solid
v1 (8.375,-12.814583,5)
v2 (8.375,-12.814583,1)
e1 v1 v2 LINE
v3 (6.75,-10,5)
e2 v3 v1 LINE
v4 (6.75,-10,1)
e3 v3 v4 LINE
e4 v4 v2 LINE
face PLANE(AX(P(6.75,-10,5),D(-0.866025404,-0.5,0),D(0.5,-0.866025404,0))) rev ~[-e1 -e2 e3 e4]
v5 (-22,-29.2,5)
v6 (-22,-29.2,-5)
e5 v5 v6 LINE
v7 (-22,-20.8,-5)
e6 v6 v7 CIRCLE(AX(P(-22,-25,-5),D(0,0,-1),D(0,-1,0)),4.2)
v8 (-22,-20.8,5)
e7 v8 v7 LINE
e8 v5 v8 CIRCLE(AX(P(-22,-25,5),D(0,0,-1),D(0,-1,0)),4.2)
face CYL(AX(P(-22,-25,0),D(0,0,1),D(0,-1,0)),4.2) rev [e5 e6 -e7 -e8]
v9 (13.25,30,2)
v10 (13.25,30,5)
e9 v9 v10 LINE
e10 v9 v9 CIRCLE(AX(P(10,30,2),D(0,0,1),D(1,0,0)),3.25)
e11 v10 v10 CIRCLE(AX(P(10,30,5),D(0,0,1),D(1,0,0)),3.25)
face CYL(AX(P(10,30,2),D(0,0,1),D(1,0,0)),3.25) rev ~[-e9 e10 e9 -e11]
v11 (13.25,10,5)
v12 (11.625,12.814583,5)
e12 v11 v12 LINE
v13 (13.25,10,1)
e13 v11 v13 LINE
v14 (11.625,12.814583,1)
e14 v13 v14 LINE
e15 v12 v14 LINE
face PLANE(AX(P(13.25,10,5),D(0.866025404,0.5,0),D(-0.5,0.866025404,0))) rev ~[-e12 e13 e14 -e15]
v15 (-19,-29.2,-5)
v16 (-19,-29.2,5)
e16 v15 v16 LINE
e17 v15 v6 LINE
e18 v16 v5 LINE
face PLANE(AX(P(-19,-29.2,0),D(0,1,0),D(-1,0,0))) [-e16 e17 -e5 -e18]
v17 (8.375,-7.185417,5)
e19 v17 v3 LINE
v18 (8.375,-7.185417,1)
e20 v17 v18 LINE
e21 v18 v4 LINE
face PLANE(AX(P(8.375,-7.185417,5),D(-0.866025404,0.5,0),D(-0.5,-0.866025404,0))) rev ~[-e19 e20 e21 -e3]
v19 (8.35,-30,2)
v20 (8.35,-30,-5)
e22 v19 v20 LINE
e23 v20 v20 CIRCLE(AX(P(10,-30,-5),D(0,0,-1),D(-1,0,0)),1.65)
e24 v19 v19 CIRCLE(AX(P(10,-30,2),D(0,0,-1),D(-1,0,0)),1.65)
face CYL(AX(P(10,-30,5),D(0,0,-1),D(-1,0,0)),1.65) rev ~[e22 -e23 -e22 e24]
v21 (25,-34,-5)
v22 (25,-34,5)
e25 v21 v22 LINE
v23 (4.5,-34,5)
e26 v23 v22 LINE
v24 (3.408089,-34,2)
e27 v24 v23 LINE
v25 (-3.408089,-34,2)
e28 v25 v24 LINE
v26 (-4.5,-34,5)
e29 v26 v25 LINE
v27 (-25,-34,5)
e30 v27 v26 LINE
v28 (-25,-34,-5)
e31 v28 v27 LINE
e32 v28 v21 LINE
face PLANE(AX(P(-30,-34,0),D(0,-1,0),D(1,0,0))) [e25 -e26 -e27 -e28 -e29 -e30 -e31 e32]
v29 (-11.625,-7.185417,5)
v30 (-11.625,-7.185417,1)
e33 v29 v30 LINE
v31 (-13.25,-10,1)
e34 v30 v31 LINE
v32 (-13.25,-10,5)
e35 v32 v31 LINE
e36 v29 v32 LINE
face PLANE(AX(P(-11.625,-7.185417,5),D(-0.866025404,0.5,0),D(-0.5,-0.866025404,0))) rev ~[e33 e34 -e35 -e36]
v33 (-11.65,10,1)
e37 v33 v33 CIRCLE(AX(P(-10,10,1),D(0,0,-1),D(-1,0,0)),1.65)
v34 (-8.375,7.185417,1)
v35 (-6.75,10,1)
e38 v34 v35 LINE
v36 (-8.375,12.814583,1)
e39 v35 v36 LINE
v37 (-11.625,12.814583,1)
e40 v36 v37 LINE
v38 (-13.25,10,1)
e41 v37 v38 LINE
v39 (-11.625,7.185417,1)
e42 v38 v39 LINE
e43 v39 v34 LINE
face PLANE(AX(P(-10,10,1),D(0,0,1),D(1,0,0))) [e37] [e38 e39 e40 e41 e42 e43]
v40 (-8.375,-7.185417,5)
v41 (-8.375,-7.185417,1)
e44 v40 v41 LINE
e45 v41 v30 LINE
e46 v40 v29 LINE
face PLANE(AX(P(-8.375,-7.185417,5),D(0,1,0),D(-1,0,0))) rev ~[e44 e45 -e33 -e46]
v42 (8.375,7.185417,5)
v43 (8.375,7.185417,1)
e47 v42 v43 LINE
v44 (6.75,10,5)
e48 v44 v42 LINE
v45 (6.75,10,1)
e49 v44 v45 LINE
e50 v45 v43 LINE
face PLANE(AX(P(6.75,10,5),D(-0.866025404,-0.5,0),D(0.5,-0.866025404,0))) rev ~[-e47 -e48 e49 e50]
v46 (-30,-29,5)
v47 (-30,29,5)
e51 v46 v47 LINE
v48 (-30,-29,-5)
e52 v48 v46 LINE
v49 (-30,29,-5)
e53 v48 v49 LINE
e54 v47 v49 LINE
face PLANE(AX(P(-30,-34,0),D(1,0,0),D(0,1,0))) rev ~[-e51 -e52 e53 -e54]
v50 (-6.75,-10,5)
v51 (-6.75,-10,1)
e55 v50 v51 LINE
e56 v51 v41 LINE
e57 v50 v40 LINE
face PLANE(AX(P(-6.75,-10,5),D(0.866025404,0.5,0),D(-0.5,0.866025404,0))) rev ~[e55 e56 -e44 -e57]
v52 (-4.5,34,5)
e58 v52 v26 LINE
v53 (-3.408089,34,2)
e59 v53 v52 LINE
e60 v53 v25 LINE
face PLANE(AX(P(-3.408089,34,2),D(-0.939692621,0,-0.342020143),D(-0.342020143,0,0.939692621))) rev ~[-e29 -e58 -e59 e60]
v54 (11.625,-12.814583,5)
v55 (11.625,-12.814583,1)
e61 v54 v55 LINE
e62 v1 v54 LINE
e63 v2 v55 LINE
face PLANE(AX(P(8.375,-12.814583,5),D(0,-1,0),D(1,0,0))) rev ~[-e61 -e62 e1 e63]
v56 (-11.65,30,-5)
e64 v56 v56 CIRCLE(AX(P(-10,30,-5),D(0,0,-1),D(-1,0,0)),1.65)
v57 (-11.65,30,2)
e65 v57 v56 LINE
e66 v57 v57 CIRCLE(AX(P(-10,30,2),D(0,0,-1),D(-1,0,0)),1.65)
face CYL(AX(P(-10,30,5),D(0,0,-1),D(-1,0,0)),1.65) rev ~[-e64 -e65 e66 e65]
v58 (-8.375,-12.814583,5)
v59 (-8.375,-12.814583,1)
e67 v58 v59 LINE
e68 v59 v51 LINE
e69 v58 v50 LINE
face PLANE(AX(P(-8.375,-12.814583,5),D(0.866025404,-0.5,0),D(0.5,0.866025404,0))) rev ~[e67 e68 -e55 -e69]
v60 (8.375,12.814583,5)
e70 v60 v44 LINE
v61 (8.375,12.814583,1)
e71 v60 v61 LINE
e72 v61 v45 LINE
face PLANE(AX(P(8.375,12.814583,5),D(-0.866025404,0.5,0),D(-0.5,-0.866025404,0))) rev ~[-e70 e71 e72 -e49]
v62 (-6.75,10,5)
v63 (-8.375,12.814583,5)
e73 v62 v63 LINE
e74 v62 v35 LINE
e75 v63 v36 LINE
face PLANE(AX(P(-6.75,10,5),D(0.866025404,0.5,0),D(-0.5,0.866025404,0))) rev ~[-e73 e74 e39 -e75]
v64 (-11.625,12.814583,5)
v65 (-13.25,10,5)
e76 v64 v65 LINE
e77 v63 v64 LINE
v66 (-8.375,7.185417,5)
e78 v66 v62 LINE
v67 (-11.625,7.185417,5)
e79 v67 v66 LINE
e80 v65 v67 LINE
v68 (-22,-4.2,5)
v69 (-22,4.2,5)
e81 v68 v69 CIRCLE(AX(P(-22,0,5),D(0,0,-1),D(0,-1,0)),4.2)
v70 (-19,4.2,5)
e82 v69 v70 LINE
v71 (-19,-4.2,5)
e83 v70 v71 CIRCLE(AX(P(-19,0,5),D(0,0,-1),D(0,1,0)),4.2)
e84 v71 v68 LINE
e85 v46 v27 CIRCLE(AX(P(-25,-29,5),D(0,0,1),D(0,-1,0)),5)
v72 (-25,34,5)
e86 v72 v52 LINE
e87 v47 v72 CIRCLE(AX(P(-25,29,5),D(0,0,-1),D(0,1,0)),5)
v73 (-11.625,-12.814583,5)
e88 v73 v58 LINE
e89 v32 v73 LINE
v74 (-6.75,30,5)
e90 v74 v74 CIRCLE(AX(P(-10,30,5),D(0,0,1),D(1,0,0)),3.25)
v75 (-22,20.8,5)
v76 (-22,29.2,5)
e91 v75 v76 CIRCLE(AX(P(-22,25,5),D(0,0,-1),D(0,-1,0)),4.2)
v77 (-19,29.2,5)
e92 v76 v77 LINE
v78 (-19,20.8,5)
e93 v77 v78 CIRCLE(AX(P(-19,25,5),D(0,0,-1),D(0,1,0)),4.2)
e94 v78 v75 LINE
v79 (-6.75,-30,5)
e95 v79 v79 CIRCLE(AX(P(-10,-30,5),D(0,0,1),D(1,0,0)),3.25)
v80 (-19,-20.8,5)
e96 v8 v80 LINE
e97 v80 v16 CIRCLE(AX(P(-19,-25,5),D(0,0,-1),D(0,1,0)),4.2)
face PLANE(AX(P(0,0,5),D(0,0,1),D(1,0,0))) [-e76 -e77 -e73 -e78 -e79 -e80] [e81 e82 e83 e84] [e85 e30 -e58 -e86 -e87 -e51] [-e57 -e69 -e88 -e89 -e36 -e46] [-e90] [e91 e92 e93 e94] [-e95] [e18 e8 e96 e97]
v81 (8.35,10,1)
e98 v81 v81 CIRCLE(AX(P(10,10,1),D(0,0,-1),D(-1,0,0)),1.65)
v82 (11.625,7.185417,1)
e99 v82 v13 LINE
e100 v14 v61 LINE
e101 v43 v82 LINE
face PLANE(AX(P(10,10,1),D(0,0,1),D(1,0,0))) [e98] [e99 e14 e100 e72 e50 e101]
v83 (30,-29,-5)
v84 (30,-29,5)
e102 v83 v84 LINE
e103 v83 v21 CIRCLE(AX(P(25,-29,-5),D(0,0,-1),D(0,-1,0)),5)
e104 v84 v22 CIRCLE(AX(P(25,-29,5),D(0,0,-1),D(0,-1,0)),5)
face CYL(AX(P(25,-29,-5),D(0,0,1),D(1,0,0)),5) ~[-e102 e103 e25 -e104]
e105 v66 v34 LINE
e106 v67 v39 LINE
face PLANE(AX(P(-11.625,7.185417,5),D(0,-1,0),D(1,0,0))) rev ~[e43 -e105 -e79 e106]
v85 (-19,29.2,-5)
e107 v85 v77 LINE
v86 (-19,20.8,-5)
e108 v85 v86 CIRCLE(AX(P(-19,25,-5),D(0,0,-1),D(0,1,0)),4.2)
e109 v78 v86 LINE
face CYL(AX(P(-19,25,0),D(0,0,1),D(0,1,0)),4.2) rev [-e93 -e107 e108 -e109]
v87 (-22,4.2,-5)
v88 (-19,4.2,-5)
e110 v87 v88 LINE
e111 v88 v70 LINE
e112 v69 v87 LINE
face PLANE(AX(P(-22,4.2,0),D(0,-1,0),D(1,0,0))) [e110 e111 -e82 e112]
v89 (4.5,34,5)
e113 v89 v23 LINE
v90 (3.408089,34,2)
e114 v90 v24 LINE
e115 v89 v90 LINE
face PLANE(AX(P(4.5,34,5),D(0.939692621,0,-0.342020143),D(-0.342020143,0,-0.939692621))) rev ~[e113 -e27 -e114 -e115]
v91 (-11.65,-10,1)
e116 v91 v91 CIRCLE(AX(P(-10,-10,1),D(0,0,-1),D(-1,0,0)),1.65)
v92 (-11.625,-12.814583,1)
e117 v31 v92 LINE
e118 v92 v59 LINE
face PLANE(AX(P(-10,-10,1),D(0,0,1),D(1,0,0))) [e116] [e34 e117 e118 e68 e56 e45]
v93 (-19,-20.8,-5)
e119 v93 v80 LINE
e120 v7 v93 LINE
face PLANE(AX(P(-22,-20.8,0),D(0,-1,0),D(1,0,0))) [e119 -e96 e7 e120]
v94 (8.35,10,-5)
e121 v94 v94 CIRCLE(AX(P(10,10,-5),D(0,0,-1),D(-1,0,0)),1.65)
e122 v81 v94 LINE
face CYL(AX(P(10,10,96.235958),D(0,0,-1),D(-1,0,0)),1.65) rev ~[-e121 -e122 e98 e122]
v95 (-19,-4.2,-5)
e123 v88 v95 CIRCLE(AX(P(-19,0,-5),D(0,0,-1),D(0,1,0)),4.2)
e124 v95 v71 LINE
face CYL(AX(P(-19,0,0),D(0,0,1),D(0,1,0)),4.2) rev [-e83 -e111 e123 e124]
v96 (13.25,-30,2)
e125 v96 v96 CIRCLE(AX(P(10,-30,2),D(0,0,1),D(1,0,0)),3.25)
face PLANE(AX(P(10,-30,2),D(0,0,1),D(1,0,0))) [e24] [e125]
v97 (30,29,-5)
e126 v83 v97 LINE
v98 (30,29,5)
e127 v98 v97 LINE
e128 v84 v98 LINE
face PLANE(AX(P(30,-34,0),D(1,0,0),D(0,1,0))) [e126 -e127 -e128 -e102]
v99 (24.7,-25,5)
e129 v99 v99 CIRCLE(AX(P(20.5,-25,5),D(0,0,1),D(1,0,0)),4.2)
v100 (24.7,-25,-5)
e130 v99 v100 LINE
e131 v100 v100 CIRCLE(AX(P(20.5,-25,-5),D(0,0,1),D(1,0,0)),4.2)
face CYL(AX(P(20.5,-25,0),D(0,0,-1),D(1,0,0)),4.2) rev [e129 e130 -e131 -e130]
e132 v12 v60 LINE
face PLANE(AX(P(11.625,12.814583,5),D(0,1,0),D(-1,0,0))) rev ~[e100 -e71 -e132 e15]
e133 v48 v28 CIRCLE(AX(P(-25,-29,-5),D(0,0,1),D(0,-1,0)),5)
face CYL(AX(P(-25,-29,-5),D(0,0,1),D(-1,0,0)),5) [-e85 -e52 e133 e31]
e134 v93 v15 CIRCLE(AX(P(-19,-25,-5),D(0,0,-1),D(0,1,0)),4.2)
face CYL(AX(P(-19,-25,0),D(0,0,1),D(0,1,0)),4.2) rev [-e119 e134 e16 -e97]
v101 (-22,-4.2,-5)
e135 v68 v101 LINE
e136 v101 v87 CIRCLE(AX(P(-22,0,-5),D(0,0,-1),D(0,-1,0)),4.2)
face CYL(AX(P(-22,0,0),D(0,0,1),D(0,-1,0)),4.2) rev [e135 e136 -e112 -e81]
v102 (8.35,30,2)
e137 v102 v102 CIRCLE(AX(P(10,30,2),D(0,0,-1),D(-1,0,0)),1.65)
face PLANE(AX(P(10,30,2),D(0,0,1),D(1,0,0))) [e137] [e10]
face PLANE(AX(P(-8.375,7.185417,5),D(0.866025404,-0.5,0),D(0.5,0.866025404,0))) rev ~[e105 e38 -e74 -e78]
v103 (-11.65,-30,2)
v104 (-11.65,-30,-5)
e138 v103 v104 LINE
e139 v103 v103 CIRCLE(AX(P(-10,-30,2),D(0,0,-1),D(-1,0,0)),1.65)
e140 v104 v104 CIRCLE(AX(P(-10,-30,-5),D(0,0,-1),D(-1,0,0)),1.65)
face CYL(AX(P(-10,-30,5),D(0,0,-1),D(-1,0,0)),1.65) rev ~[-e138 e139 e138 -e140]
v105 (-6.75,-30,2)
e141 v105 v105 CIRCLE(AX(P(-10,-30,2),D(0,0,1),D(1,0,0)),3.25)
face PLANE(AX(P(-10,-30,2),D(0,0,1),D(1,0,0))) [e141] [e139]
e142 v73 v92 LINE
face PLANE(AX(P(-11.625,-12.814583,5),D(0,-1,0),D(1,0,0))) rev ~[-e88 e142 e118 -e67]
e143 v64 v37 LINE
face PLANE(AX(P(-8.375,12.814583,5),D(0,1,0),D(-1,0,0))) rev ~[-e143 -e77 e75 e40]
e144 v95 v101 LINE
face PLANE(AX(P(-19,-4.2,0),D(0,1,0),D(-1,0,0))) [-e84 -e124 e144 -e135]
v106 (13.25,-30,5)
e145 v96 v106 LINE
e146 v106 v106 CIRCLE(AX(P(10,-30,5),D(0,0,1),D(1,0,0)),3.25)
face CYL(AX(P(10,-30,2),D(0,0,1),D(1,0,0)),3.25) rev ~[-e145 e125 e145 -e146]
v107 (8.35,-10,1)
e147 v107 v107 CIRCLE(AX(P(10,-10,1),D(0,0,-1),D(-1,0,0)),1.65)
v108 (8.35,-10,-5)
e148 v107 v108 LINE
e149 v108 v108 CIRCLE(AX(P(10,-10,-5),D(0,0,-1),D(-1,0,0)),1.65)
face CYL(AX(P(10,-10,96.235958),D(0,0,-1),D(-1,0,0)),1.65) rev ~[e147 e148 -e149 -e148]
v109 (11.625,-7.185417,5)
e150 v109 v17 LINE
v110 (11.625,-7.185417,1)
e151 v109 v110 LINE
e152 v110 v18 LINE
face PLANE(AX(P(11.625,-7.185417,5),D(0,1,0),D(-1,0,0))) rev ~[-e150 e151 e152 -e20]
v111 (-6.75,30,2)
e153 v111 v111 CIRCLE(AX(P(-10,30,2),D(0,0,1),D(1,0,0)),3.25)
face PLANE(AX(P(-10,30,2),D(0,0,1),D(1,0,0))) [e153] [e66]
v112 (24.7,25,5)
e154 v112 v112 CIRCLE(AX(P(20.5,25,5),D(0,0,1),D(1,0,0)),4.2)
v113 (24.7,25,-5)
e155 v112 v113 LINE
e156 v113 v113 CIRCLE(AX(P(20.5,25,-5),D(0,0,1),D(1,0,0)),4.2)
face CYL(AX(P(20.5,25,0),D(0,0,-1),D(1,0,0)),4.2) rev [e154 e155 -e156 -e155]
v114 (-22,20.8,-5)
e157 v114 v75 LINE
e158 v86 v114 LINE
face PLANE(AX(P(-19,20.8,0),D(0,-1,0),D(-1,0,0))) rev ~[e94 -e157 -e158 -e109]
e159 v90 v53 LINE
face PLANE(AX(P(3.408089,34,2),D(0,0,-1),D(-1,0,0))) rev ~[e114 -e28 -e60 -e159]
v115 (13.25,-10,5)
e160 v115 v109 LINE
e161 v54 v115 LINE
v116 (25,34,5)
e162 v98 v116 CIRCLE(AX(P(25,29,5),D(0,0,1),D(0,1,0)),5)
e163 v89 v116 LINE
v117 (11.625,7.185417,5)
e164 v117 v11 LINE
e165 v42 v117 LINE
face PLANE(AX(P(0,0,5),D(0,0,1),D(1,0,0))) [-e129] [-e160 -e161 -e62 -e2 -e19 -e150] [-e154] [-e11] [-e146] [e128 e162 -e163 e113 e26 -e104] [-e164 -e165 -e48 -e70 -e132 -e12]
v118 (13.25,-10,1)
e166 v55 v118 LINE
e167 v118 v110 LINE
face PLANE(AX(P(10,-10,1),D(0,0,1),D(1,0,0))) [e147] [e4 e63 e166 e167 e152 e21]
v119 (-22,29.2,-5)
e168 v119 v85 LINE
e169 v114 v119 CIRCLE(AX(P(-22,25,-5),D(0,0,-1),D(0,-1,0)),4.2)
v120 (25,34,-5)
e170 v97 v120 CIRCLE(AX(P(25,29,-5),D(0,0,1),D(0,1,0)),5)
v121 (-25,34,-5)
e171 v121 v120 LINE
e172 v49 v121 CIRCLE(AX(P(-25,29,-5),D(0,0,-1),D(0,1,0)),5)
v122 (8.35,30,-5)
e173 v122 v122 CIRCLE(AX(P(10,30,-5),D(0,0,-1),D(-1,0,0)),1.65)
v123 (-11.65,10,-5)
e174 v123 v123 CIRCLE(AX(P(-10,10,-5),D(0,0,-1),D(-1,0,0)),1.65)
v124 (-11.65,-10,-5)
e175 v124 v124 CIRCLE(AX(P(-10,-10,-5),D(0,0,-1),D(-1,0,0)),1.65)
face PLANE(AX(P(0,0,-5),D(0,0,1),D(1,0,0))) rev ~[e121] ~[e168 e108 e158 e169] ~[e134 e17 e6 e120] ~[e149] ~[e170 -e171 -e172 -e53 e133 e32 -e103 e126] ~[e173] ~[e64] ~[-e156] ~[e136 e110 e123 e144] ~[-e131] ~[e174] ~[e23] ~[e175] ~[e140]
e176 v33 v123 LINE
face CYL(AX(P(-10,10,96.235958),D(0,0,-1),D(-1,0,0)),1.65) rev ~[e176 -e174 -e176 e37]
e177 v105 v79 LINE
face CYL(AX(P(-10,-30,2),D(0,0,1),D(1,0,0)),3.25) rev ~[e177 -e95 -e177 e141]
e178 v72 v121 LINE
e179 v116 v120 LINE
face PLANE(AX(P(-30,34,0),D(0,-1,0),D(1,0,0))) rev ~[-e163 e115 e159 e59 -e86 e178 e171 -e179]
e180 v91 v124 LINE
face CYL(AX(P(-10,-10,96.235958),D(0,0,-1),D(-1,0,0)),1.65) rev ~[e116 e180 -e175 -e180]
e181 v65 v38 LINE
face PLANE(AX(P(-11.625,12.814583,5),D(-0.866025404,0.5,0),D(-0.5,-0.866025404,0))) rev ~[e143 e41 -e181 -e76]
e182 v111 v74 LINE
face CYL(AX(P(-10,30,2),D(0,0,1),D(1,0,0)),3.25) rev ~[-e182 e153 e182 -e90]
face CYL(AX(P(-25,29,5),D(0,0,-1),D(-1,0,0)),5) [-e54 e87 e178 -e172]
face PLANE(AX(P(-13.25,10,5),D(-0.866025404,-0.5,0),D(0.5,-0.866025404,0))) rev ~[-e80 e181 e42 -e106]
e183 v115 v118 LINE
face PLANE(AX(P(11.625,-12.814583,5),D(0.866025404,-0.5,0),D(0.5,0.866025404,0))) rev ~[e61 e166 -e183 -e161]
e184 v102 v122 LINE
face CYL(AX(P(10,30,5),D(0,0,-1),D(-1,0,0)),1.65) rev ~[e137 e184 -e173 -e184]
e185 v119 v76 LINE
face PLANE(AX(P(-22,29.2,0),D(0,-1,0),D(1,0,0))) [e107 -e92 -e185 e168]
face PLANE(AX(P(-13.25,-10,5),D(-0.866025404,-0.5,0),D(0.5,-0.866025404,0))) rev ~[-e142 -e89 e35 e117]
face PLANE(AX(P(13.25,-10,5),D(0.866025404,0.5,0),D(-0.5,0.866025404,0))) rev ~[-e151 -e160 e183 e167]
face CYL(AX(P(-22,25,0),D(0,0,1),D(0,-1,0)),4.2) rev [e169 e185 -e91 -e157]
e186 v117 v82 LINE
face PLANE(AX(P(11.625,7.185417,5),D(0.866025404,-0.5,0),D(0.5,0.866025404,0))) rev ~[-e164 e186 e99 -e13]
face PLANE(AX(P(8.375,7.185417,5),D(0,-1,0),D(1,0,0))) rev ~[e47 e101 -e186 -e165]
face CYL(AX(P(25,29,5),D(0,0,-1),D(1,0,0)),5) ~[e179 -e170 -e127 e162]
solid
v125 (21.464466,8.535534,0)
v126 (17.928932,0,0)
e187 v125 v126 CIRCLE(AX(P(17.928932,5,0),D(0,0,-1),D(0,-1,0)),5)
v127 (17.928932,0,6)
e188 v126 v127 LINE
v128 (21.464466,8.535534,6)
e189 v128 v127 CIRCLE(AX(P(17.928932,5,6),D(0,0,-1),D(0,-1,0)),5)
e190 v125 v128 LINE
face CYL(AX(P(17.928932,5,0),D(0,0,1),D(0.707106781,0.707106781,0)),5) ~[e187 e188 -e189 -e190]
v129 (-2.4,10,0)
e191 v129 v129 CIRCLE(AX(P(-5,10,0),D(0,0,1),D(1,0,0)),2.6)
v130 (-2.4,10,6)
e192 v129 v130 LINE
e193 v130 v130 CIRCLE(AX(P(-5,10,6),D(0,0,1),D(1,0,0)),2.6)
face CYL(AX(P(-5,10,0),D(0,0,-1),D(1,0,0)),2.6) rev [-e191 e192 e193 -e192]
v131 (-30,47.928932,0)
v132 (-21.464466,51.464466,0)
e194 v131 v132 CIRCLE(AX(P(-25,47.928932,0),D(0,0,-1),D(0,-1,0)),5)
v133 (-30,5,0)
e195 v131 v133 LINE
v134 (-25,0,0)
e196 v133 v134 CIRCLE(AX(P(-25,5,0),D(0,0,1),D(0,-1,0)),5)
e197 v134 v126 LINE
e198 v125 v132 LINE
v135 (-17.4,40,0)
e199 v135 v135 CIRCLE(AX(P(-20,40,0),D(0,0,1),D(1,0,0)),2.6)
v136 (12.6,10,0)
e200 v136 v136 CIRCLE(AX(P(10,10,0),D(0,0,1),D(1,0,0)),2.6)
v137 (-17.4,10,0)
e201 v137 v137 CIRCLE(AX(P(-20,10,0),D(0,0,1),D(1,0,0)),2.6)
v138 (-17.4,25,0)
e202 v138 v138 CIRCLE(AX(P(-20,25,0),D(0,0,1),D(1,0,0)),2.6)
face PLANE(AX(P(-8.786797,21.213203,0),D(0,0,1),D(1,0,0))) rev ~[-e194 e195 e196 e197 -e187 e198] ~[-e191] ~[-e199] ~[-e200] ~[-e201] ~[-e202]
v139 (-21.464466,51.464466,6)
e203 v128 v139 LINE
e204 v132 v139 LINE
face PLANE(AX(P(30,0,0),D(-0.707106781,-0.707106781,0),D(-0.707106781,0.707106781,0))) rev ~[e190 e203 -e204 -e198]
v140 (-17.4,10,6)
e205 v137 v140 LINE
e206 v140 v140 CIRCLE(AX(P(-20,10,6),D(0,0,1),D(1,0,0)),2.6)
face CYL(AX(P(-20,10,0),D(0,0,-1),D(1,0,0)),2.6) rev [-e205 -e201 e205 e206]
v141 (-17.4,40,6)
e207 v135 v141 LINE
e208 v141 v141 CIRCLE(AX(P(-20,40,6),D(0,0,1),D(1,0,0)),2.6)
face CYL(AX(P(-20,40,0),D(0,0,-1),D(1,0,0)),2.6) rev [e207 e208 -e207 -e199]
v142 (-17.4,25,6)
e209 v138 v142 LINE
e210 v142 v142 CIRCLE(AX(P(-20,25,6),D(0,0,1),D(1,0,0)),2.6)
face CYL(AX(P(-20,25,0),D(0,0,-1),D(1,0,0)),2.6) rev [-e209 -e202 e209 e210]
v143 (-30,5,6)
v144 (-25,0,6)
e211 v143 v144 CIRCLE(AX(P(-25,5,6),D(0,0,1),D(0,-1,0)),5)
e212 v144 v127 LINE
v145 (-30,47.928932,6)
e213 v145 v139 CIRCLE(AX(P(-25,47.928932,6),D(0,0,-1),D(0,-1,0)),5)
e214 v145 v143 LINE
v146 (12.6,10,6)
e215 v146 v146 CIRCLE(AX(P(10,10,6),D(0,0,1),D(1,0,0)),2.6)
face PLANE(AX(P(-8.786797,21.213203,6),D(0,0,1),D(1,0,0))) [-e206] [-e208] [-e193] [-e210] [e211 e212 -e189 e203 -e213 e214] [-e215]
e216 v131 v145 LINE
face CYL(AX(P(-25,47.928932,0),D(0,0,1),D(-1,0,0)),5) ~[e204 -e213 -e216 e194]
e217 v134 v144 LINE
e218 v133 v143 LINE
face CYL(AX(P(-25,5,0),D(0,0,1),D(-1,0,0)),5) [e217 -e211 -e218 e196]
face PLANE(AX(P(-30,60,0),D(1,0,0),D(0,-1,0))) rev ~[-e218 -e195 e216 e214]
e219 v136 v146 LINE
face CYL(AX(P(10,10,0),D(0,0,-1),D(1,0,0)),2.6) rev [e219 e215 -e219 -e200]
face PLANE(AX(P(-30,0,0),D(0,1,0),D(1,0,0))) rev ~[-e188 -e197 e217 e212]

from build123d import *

# Parameters (mm, degrees)
F0_R           = 2.6
F1_DEPTH       = 6
F2_R           = 5
F3_W           = 60
F3_H           = 68
F3_R           = 4.2
F4_DEPTH       = 5
F5_R           = 5
F7_D           = 3.3
F7_CBORE_D     = 6.5
F7_CBORE_DEPTH = 3
F9_DEPTH       = 4
F10_D          = 3.3
F12_DEPTH      = 3
F12_TAPER      = 20
F13_DEPTH      = 68.001


with BuildPart() as f1:
    # F0 (on Top) → F1 (new body)
    with BuildSketch(Plane.XY):
        Polygon((-30, 60), (-30, 0), (30, 0), align=None)
        with Locations((-20, 10)):
            Circle(F0_R, mode=Mode.SUBTRACT)
        with Locations((-5, 10)):
            Circle(F0_R, mode=Mode.SUBTRACT)
        with Locations((-20, 25)):
            Circle(F0_R, mode=Mode.SUBTRACT)
        with Locations((10, 10)):
            Circle(F0_R, mode=Mode.SUBTRACT)
        with Locations((-20, 40)):
            Circle(F0_R, mode=Mode.SUBTRACT)
    extrude(amount=F1_DEPTH)

    # F2
    f2_edges = [f1.edges().sort_by_distance(p)[0] for p in [
        (-30, 0, 3),
        (30, 0, 3),
        (-30, 60, 3),
    ]]
    fillet(f2_edges, radius=F2_R)


with BuildPart() as f4:
    # F3 (on Top) → F4 (new body, symmetric)
    with BuildSketch(Plane.XY):
        Rectangle(F3_W, F3_H)
        with BuildLine():
            ThreePointArc((-19, -20.8), (-14.8, -25), (-19, -29.2))
            Line((-19, -29.2), (-22, -29.2))
            ThreePointArc((-22, -29.2), (-26.2, -25), (-22, -20.8))
            Line((-22, -20.8), (-19, -20.8))
        make_face(mode=Mode.SUBTRACT)
        with Locations((20.5, -25)):
            Circle(F3_R, mode=Mode.SUBTRACT)
        with BuildLine():
            ThreePointArc((-19, 4.2), (-14.8, 0), (-19, -4.2))
            Line((-19, -4.2), (-22, -4.2))
            ThreePointArc((-22, -4.2), (-26.2, 0), (-22, 4.2))
            Line((-22, 4.2), (-19, 4.2))
        make_face(mode=Mode.SUBTRACT)
        with BuildLine():
            ThreePointArc((-19, 29.2), (-14.8, 25), (-19, 20.8))
            Line((-19, 20.8), (-22, 20.8))
            ThreePointArc((-22, 20.8), (-26.2, 25), (-22, 29.2))
            Line((-22, 29.2), (-19, 29.2))
        make_face(mode=Mode.SUBTRACT)
        with Locations((20.5, 25)):
            Circle(F3_R, mode=Mode.SUBTRACT)
    extrude(amount=F4_DEPTH, both=True)

    # F5
    f5_edges = [f4.edges().sort_by_distance(p)[0] for p in [
        (-30, 34, 0),
        (-30, -34, 0),
        (30, -34, 0),
        (30, 34, 0),
    ]]
    fillet(f5_edges, radius=F5_R)

    # F7 (through all)
    with Locations(Plane.XY.offset(5)):
        with Locations((-10, 30), (10, 30), (-10, -30), (10, -30)):
            CounterBoreHole(F7_D / 2, F7_CBORE_D / 2, F7_CBORE_DEPTH)

    # F8 (on face) → F9 (cut)
    with BuildSketch(Plane.XY.offset(5)):
        Polygon((-11.625, 12.8145825623), (-13.25, 10), (-11.625, 7.1854174377), (-8.375, 7.1854174377), (-6.75, 10), (-8.375, 12.8145825623), align=None)
        Polygon((8.375, 12.8145825623), (6.75, 10), (8.375, 7.1854174377), (11.625, 7.1854174377), (13.25, 10), (11.625, 12.8145825623), align=None)
        Polygon((-8.375, -12.8145825623), (-6.75, -10), (-8.375, -7.1854174377), (-11.625, -7.1854174377), (-13.25, -10), (-11.625, -12.8145825623), align=None)
        Polygon((8.375, -7.1854174377), (6.75, -10), (8.375, -12.8145825623), (11.625, -12.8145825623), (13.25, -10), (11.625, -7.1854174377), align=None)
    extrude(amount=-F9_DEPTH, mode=Mode.SUBTRACT)

    # F10 (through all)
    with Locations(Plane.XY.offset(5)):
        with Locations((-10, 10), (10, 10), (-10, -10), (10, -10)):
            Hole(F10_D / 2)

    # F11 (on face) → F12 (cut)
    with BuildSketch(Plane(origin=(0, 34, 0), x_dir=(-1, 0, 0), z_dir=(0, 1, 0))):
        Polygon((4.5, 5), (-4.5, 5), (-3.4080892972, 2), (3.4080892972, 2), align=None)
    extrude(amount=-F12_DEPTH, taper=F12_TAPER, mode=Mode.SUBTRACT)

    # F11 (on face) → F13 (cut, through all)
    with BuildSketch(Plane(origin=(0, 34, 0), x_dir=(-1, 0, 0), z_dir=(0, 1, 0))):
        Polygon((4.5, 5), (-4.5, 5), (-3.4080892972, 2), (3.4080892972, 2), align=None)
    extrude(amount=-F13_DEPTH, mode=Mode.SUBTRACT)


solid = Compound([f1.part, f4.part])
